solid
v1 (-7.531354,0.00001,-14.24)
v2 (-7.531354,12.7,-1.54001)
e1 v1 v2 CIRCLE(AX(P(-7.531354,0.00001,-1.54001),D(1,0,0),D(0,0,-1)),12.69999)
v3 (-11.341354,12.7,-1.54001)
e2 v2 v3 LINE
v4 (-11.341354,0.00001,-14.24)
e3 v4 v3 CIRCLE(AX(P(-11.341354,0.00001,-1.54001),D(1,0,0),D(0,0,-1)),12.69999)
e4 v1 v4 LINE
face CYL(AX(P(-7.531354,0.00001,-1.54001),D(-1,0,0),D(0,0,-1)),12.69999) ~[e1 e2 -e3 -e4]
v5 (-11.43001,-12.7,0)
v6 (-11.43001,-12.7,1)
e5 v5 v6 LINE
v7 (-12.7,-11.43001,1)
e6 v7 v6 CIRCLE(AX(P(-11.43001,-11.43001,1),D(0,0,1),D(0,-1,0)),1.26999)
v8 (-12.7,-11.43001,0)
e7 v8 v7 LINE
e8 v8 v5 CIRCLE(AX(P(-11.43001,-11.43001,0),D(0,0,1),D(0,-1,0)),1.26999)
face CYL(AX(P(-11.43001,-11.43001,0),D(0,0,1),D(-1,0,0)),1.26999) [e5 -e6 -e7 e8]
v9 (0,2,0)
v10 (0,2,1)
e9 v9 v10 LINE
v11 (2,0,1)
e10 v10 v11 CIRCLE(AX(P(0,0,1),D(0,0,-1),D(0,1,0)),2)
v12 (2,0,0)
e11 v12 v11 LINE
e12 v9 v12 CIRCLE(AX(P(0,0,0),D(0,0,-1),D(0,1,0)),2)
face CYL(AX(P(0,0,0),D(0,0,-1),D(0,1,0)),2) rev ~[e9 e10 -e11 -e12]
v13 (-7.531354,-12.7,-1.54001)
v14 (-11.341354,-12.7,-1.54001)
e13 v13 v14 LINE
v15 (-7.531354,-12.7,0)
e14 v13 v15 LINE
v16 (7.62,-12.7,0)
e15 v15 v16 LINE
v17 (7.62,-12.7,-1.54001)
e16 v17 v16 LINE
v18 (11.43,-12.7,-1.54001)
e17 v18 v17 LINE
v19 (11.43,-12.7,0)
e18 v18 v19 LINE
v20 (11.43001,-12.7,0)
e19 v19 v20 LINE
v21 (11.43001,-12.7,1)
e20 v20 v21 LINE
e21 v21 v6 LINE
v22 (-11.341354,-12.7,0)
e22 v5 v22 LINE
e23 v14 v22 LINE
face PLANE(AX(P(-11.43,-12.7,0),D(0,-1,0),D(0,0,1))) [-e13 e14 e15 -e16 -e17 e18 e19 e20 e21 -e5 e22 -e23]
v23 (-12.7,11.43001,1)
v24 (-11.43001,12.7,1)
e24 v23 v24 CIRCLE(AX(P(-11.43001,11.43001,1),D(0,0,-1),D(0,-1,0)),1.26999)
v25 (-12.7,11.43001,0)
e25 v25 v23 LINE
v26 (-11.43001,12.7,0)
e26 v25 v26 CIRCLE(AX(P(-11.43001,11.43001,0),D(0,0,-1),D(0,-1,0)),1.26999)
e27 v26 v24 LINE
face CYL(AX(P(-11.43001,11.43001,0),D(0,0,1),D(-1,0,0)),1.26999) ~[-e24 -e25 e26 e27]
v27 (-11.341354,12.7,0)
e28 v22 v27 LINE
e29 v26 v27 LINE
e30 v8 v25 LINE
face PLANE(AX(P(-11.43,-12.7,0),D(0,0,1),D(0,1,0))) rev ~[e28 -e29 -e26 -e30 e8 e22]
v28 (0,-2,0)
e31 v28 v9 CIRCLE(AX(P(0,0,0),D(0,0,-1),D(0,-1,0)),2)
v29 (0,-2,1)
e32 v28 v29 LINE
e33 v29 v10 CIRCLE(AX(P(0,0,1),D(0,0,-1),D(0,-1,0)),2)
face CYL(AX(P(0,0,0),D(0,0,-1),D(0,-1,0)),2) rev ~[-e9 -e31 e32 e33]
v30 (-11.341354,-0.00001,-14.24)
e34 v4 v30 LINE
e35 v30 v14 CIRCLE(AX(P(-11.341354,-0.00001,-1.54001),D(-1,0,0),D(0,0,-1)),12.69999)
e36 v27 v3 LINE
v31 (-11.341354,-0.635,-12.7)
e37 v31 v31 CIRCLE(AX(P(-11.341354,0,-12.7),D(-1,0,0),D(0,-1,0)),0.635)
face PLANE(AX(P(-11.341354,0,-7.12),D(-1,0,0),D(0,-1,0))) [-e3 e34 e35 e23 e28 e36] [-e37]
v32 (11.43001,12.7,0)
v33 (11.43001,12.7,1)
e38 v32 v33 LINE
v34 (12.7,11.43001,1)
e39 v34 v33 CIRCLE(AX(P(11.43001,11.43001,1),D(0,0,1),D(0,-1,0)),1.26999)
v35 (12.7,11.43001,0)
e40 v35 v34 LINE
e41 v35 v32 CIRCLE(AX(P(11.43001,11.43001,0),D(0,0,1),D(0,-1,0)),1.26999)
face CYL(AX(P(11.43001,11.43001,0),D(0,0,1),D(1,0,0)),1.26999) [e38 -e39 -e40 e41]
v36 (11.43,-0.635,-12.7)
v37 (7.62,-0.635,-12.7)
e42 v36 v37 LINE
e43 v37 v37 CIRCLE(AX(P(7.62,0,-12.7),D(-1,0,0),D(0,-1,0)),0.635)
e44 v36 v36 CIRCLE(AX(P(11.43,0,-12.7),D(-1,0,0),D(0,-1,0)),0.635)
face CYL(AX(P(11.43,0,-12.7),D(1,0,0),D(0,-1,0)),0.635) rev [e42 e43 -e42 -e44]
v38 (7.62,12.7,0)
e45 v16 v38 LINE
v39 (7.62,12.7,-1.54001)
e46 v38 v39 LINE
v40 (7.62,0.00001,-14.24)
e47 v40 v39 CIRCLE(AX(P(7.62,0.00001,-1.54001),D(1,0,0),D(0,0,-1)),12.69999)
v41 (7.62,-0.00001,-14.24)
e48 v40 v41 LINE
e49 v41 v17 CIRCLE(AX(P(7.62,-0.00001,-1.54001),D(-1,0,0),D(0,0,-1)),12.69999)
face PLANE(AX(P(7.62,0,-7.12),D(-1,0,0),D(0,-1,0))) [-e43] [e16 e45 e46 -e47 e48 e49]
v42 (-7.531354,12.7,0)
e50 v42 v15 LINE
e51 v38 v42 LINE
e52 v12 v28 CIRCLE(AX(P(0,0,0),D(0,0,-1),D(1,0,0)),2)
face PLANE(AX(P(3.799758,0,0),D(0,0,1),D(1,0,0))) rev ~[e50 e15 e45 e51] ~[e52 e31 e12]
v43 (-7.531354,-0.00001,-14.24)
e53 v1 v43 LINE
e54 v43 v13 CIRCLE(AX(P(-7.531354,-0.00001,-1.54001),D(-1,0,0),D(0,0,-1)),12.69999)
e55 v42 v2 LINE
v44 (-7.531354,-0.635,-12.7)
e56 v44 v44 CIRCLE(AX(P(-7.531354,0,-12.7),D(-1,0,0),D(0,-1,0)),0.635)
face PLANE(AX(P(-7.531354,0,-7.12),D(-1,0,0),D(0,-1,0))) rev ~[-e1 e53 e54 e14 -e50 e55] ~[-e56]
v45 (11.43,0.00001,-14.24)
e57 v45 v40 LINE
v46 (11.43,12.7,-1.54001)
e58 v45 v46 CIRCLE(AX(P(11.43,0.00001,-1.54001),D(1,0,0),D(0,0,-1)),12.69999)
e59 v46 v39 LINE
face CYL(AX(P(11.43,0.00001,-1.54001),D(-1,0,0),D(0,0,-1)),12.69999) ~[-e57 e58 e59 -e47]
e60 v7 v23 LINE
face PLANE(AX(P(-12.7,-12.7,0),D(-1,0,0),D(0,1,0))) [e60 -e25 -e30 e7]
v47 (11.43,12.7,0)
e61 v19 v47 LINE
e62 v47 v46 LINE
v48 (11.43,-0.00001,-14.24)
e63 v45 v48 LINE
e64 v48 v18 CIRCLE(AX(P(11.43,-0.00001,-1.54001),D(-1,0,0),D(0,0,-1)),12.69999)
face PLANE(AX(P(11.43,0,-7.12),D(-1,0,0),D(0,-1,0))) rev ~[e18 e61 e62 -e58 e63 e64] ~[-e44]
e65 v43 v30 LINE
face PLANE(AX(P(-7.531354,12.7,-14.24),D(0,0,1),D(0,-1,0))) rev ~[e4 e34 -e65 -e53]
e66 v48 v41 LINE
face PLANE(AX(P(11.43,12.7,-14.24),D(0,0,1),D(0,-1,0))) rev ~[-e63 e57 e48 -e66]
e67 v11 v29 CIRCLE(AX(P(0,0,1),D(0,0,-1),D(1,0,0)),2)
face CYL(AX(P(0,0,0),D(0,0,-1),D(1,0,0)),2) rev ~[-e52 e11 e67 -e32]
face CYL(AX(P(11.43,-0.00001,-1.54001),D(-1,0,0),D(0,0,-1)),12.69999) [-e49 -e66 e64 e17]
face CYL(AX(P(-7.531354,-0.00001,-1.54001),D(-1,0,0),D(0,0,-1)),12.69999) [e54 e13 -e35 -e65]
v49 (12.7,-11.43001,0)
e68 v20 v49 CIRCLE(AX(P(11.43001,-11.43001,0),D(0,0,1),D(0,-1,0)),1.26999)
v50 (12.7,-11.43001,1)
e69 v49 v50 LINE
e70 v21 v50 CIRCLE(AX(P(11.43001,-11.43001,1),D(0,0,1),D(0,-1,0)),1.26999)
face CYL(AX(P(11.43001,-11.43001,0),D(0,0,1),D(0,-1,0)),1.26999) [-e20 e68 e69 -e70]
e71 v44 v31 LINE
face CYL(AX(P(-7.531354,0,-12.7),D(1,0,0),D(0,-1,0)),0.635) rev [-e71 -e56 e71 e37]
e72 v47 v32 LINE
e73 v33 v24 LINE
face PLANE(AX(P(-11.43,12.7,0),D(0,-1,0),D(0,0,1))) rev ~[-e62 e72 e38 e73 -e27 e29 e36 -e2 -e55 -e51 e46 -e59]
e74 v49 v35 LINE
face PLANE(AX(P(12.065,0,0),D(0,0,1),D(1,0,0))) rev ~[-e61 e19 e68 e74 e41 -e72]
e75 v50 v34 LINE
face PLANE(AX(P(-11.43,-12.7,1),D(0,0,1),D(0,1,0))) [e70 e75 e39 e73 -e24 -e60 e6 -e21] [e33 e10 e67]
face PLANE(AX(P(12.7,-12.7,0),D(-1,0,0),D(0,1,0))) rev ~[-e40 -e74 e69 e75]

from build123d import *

# Parameters (mm, degrees)
F0_W     = 1.27
F0_H     = 25.4
F1_DEPTH = 1
F2_W     = 25.4
F2_H     = 14.24
F2_R     = 0.635
F2_H_2   = 1
F3_DEPTH = 3.81
F5_R     = 12.69999
F6_R     = 12.69999
F7_R     = 1.26999
F7_2_R   = 1.26999
F8_DEPTH = 0.0889


# Not quite as in the source:
# - a fillet or chamfer is up to 0.001 mm smaller than in the source, because OpenCascade refuses the exact size


with BuildPart() as f1:
    # F0 (on Top) → F1 (new body)
    with BuildSketch(Plane.XY):
        with Locations((-12.065, 0)):
            Rectangle(F0_W, F0_H)
    extrude(amount=F1_DEPTH)

    # F7 (radius 1.27 in the source; OpenCascade refuses exactly that, so slightly less here)
    f7_edges = [f1.edges().sort_by_distance(p)[0] for p in [
        (-12.7, -12.7, 0.5),
        (-12.7, 12.7, 0.5),
    ]]
    fillet(f7_edges, radius=F7_R)

    # F8 (add): a face of the model
    f8_faces = [f1.faces().sort_by_distance(p)[0] for p in [
        (-11.43, 0, 0.5),
    ]]


with BuildPart() as f1b:
    # F0 (on Top) → F1, piece 2 (new body)
    with BuildSketch(Plane.XY):
        with Locations((12.065, 0)):
            Rectangle(F0_W, F0_H)
    extrude(amount=F1_DEPTH)

    # F7#2 (radius 1.27 in the source; OpenCascade refuses exactly that, so slightly less here)
    f7_2_edges = [f1b.edges().sort_by_distance(p)[0] for p in [
        (12.7, -12.7, 0.5),
        (12.7, 12.7, 0.5),
    ]]
    fillet(f7_2_edges, radius=F7_2_R)


with BuildPart() as f1c:
    # F0 (on Top) → F1, piece 3 (new body)
    with BuildSketch(Plane.XY):
        with BuildLine():
            Line((0, -12.7), (7.62, -12.7))
            Line((7.62, -12.7), (7.62, 12.7))
            Line((7.62, 12.7), (0, 12.7))
            Line((0, 12.7), (0, 2))
            ThreePointArc((0, 2), (1.4142135624, 1.4142135624), (2, 0))
            ThreePointArc((2, 0), (1.4142135624, -1.4142135624), (0, -2))
            Line((0, -2), (0, -12.7))
        make_face()
        with BuildLine():
            Line((-7.62, -12.7), (0, -12.7))
            Line((0, -12.7), (0, -2))
            ThreePointArc((0, -2), (-2, 0), (0, 2))
            Line((0, 2), (0, 12.7))
            Line((0, 12.7), (-7.62, 12.7))
            Line((-7.62, 12.7), (-7.62, -12.7))
        make_face()
    extrude(amount=F1_DEPTH)


with BuildPart() as f3:
    # F2 (on face) → F3 (new body)
    with BuildSketch(Plane(origin=(11.43, 0, 0), x_dir=(0, -1, 0), z_dir=(-1, 0, 0))):
        with Locations((0, -7.12)):
            Rectangle(F2_W, F2_H)
        with Locations((0, -12.7)):
            Circle(F2_R, mode=Mode.SUBTRACT)
        with Locations((0, 0.5)):
            Rectangle(F2_W, F2_H_2)
    extrude(amount=F3_DEPTH)


with BuildPart() as f4_1:
    # F4: copy of F3
    add(f3.part.moved(Location((-18.961354, 0, 0))))

    # F6 (radius 12.7 in the source; OpenCascade refuses exactly that, so slightly less here)
    f6_edges = [f4_1.edges().sort_by_distance(p)[0] for p in [
        (-9.436354, -12.7, -14.24),
        (-9.436354, 12.7, -14.24),
    ]]
    fillet(f6_edges, radius=F6_R)


with BuildPart() as f3_1:
    add(f3.part)

    # F5 (radius 12.7 in the source; OpenCascade refuses exactly that, so slightly less here)
    f5_edges = [f3_1.edges().sort_by_distance(p)[0] for p in [
        (9.525, -12.7, -14.24),
        (9.525, 12.7, -14.24),
    ]]
    fillet(f5_edges, radius=F5_R)


with BuildPart() as f1_1:
    add(f1.part)

    add(f1b.part)  # F8 merges F1b

    add(f1c.part)  # F8 merges F1c

    add(f3_1.part)  # F8 merges F3

    add(f4_1.part)  # F8 merges F4_1
    extrude(f8_faces, amount=F8_DEPTH)


solid = f1_1.part
